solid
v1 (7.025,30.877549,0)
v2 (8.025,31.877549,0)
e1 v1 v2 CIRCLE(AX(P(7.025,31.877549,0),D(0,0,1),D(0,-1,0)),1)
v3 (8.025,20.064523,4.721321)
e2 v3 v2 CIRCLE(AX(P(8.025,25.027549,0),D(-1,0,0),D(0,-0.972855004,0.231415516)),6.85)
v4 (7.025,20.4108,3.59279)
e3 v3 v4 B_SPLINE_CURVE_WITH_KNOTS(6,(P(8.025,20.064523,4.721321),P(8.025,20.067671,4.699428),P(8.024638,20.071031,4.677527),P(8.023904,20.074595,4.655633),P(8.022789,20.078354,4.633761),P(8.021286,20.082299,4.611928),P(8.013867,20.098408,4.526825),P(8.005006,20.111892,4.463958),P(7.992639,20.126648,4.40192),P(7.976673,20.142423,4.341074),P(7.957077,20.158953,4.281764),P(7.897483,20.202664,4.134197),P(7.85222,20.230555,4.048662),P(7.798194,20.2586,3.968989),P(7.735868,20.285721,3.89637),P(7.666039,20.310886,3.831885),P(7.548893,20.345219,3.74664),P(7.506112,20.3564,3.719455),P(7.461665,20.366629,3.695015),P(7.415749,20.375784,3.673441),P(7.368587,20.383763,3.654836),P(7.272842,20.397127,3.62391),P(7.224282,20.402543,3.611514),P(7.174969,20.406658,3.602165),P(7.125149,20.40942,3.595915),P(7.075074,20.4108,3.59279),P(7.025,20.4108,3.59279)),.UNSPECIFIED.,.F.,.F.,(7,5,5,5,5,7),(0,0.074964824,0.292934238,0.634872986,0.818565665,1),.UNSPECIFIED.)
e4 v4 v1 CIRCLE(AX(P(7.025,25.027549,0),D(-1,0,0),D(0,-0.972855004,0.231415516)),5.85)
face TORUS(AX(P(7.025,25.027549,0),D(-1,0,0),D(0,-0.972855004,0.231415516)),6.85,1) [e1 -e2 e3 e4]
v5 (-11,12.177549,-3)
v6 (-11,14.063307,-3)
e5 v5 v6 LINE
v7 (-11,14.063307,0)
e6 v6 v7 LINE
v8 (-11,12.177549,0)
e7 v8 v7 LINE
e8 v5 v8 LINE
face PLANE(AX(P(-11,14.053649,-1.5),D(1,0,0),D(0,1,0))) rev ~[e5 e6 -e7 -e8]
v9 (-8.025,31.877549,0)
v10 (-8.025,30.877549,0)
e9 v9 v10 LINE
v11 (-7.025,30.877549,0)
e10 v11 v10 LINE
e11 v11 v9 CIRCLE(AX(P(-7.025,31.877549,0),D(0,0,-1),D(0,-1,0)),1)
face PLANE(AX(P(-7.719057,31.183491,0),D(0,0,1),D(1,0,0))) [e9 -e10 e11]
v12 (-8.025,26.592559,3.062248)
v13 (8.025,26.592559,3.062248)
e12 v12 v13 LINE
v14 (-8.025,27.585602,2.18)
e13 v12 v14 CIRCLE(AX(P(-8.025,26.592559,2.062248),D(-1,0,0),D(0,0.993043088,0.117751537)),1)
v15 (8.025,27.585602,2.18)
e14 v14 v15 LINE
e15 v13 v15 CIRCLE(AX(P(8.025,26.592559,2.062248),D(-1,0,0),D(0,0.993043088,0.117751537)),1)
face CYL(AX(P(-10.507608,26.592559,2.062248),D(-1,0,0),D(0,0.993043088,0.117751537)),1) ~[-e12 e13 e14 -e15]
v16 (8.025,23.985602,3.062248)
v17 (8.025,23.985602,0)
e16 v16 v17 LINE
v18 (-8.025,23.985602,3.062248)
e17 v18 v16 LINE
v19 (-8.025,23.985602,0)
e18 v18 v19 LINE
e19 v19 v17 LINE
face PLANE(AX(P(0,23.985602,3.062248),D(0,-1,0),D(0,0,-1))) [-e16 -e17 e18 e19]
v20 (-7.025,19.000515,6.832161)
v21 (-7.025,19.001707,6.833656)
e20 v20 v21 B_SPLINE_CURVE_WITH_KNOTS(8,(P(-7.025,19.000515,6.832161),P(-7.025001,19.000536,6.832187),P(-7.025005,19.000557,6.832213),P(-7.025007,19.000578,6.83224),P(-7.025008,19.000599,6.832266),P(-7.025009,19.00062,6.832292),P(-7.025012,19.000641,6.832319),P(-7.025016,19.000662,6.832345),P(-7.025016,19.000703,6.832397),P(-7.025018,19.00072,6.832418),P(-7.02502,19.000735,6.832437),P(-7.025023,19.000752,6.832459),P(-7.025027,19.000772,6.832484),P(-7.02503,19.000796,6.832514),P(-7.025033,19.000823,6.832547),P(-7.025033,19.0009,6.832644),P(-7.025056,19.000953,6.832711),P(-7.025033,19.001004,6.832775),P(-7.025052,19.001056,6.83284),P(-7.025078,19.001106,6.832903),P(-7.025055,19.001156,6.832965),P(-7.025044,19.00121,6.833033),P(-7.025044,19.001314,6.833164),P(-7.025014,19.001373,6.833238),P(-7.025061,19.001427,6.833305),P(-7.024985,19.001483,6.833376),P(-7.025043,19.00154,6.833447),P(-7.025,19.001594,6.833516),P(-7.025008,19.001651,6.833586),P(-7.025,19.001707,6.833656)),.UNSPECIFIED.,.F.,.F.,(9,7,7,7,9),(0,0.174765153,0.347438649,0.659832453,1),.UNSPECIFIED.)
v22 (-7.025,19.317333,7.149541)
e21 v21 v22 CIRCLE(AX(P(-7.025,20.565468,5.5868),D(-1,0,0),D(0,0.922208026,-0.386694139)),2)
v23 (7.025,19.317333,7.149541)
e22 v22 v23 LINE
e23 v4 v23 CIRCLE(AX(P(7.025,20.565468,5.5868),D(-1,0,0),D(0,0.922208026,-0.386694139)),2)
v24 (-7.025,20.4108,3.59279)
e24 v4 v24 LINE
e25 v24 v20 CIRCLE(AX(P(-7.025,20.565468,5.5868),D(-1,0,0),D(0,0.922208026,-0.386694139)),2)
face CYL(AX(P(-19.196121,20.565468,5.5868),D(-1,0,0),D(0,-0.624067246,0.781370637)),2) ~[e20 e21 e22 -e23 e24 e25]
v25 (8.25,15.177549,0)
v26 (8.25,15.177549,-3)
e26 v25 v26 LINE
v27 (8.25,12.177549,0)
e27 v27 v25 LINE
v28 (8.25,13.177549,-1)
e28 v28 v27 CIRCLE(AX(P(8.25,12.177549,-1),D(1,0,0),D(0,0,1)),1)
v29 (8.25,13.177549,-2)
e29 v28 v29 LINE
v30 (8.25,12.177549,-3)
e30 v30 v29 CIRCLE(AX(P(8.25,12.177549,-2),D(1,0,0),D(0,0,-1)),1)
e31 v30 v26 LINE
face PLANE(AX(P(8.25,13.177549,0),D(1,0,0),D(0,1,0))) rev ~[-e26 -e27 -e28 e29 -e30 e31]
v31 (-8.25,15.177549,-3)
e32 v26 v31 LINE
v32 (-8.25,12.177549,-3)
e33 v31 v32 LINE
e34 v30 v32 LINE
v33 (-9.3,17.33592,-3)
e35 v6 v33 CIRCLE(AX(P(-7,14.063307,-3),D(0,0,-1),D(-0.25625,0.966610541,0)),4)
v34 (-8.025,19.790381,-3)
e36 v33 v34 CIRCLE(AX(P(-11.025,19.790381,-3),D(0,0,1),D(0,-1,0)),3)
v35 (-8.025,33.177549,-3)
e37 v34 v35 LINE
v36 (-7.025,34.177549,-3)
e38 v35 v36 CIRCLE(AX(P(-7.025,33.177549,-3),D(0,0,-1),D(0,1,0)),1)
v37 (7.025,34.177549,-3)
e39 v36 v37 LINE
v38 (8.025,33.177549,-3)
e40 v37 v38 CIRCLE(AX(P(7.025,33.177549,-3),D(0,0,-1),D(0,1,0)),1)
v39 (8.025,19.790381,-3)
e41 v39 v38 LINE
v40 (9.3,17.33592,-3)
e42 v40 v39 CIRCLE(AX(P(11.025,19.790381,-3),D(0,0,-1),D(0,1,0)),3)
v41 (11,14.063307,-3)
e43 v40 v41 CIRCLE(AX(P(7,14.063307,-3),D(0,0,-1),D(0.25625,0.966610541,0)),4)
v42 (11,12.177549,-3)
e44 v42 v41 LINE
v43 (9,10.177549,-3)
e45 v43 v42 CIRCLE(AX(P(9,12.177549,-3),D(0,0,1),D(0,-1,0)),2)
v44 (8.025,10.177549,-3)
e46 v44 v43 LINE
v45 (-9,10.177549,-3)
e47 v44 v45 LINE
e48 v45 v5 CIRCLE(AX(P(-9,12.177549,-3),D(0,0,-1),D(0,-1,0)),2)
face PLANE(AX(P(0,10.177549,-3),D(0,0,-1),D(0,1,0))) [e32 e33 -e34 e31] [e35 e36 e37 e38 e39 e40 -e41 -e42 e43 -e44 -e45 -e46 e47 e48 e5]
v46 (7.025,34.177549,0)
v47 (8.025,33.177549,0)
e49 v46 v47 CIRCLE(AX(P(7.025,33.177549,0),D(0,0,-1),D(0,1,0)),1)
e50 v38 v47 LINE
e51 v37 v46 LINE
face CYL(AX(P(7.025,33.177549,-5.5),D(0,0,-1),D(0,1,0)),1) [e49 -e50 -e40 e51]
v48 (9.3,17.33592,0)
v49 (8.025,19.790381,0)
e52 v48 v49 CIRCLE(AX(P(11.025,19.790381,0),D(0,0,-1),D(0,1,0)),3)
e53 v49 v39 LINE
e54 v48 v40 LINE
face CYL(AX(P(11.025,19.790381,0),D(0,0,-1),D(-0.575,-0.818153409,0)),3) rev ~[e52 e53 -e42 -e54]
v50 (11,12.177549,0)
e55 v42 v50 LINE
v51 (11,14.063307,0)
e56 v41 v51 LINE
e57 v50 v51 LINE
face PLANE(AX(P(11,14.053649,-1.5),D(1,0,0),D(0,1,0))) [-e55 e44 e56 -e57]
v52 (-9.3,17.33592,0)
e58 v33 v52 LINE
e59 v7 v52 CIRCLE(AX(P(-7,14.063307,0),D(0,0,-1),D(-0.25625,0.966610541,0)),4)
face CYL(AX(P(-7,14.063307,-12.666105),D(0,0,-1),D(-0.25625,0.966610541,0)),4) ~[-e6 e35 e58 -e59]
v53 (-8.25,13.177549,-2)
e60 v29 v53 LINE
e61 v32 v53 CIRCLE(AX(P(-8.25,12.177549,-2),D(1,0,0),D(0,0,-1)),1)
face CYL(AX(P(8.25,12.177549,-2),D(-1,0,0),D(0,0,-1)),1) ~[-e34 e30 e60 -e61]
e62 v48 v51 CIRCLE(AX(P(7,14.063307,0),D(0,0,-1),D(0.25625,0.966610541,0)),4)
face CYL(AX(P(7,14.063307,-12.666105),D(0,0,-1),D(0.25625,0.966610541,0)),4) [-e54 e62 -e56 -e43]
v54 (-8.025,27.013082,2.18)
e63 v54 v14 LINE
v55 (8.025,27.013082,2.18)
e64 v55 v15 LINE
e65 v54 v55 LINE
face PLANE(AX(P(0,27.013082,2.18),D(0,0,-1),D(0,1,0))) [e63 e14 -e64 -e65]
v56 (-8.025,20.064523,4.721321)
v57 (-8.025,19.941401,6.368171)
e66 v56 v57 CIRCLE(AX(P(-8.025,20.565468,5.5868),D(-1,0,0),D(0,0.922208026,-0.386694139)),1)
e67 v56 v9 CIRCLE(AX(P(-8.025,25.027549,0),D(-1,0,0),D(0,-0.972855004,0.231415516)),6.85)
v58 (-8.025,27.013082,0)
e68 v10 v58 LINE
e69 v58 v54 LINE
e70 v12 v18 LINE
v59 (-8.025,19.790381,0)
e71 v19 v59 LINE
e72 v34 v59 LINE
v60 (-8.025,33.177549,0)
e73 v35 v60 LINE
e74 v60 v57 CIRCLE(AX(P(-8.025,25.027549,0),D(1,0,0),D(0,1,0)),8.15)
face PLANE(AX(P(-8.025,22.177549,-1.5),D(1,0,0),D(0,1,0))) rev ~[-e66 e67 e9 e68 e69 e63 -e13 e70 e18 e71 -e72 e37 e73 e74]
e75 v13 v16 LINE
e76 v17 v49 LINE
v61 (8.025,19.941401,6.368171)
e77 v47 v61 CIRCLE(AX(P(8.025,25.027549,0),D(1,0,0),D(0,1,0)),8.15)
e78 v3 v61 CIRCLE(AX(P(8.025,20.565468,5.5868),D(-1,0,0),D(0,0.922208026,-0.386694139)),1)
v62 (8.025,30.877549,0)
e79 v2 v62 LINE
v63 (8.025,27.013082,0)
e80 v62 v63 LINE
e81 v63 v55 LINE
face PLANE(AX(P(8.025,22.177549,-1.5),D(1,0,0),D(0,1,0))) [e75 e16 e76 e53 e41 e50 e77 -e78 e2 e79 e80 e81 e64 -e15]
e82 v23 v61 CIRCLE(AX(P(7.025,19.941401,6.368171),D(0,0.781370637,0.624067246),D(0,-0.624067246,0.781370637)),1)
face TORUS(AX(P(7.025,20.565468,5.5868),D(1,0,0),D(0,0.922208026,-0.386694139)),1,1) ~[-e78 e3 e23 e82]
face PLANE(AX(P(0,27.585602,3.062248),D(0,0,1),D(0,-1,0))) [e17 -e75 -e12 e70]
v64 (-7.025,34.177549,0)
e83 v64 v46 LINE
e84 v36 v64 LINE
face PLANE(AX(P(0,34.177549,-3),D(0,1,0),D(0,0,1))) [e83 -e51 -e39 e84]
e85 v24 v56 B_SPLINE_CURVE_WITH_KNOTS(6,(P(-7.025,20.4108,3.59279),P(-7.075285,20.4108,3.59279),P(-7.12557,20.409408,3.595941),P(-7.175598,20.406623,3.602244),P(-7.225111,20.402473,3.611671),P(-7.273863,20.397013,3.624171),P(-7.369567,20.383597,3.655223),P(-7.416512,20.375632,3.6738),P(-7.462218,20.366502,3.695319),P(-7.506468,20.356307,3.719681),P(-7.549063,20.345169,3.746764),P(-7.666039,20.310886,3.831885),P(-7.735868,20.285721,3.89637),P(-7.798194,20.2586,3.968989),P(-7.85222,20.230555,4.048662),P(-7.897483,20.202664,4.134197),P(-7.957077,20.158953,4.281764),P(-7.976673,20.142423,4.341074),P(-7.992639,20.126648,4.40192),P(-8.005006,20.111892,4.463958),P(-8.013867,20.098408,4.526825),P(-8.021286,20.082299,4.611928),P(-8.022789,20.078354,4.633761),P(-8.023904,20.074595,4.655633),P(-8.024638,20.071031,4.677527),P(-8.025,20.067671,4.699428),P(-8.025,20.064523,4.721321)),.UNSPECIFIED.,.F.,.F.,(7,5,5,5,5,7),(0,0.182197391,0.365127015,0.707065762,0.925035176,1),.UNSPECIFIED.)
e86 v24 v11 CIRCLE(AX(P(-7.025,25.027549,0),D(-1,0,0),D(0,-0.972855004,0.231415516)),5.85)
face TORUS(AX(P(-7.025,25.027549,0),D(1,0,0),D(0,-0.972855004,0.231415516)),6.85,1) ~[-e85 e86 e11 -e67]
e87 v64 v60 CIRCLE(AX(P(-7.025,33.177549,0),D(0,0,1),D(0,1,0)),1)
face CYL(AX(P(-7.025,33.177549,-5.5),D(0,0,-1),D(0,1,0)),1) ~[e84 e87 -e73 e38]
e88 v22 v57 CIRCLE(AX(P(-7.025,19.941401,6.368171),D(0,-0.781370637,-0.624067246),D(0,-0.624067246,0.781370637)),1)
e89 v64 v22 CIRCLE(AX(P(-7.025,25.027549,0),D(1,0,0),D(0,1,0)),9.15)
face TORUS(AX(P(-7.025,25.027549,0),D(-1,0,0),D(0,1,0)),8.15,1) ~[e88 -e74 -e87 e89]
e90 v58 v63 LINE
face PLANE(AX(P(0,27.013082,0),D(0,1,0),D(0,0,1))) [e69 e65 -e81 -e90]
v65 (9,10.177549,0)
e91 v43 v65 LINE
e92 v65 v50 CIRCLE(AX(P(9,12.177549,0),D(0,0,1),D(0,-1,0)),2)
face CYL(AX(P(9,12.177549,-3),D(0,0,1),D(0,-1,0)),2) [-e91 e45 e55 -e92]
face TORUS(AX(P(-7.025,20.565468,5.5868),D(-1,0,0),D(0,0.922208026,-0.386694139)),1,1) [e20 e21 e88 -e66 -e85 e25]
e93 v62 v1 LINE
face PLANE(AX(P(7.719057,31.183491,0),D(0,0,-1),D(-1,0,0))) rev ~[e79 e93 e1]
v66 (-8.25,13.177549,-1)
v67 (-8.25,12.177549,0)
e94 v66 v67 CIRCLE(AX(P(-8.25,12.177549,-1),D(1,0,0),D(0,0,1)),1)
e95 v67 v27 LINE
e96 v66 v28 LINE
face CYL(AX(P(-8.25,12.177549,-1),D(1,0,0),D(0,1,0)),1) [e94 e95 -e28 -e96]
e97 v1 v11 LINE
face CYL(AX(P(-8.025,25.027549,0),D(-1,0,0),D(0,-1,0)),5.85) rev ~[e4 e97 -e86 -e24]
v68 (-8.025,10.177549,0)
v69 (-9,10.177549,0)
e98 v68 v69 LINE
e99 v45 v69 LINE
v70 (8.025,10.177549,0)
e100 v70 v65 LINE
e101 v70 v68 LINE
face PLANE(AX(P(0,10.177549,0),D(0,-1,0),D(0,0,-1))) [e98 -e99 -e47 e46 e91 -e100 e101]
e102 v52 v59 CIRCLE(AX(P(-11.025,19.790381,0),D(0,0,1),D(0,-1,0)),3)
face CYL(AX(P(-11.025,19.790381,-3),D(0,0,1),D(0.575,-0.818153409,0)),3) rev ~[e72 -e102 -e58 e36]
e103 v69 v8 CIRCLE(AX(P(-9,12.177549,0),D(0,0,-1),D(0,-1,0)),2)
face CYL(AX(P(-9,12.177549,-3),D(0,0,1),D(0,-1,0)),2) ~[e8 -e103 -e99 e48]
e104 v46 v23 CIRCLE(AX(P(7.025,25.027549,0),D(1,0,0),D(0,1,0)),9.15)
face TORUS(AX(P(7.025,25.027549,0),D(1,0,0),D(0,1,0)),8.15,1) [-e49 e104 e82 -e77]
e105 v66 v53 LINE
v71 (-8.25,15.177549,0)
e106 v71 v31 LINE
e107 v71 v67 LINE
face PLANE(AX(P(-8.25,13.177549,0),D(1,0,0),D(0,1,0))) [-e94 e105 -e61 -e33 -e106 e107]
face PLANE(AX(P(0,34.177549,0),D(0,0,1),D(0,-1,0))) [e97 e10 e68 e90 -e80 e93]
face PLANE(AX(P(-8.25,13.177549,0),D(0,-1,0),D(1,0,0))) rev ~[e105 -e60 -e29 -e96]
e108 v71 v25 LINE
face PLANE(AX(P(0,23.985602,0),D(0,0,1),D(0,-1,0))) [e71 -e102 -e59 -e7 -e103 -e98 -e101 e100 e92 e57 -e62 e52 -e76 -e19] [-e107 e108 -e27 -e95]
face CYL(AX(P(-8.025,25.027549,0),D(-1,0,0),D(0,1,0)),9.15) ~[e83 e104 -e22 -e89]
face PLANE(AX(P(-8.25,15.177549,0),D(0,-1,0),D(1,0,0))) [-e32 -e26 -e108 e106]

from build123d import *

# Parameters (mm, degrees)
F3_DEPTH       = 16.05
F4_W           = 5.4241176695
F4_H           = 3.5927895224
F5_DEPTH       = 25
F5_DEPTH_BACK  = 25
F6_T1_DEPTH    = 38.39224199
F8_DEPTH       = 8.025
F8_DEPTH_BACK  = 8.025
F9_T1_DEPTH    = 21.0152154422
F11_W          = 7.7522003338
F11_H          = 3
F12_DEPTH      = 11
F12_DEPTH_BACK = 11
F13_W          = 16.5
F13_H          = 2
F14_DEPTH      = 25
F15_R          = 1
F16_T1_DEPTH   = 22.3322108151
F17_T3_ANGLE   = 128.6137584612
F17_T6_ANGLE   = 128.6137584612
F17_T9_ANGLE   = 166.6195765903
F17_T12_ANGLE  = 166.6195765903
F17_T15_ANGLE  = 208.6372867238
F17_T18_ANGLE  = 208.6372867238
F17_T21_DEPTH  = 5.5
F17_T24_DEPTH  = 5.5
F18_R          = 2
F19_R          = 3


# Not quite as in the source:
# - a fillet or chamfer that OpenCascade refuses, or shapes differently, is made with other operations: its cross-section is extruded or revolved along the edge and cut away or added


with BuildPart() as f3:
    # F2 (on line) → F3 (new body)
    with BuildSketch(Plane.YZ.offset(-8.025)):
        with BuildLine():
            Line((30.8775485963, 0), (34.1775485963, 0))
            ThreePointArc((34.1775485963, 0), (25.0275485963, 9.15), (15.8775485963, 0))
            Line((15.8775485963, 0), (19.1775485963, 0))
            ThreePointArc((19.1775485963, 0), (25.0275485963, 5.85), (30.8775485963, 0))
        make_face()
    extrude(amount=F3_DEPTH)

    # F4 (on Right) → F5 (cut, two sides)
    with BuildSketch(Plane.YZ) as f5_sk:
        with Locations((17.9089335725, 1.7963947612)):
            Rectangle(F4_W, F4_H)
    extrude(amount=-F5_DEPTH, mode=Mode.SUBTRACT)
    extrude(f5_sk.sketch, amount=F5_DEPTH_BACK, mode=Mode.SUBTRACT)

    # F6: fillet of radius 2 on 1 edges, made by hand

    # F6_s2 → F6_t1 (cut)
    with BuildSketch(Plane.YZ.offset(-19.196120995)):
        with BuildLine():
            ThreePointArc((19.3173332992, 7.1495413322), (18.6537711345, 4.9990791235), (20.4108004498, 3.5927895224))
            Line((20.4108004498, 3.5927895224), (16.6124215356, 3.5927895224))
            ThreePointArc((16.6124215356, 3.5927895224), (17.7444211746, 5.5388225246), (19.3173332992, 7.1495413322))
        make_face()
    extrude(amount=F6_T1_DEPTH, mode=Mode.SUBTRACT)

    # F7 (on Right) → F8 (join, two sides)
    with BuildSketch(Plane.YZ) as f8_sk:
        Polygon((34.1775485963, 0), (27.0130820572, 0), (23.9856019616, 0), (10.1775485963, 0), (10.1775485963, -3), (34.1775485963, -3), align=None)
        Polygon((23.9856019616, 0), (27.0130820572, 0), (27.0130820572, 2.18), (27.5856019616, 2.18), (27.5856019616, 3.0622484628), (23.9856019616, 3.0622484628), (23.9856019616, 2.18), align=None)
    extrude(amount=F8_DEPTH)
    extrude(f8_sk.sketch, amount=-F8_DEPTH_BACK)

    # F9: fillet of radius 1 on 1 edges, made by hand

    # F9_s2 → F9_t1 (cut)
    with BuildSketch(Plane.YZ.offset(-10.5076077211)):
        with BuildLine():
            ThreePointArc((27.5856019616, 2.18), (27.2567307119, 2.8098284041), (26.5925588732, 3.0622484628))
            Line((26.5925588732, 3.0622484628), (27.5856019616, 3.0622484628))
            Line((27.5856019616, 3.0622484628), (27.5856019616, 2.18))
        make_face()
    extrude(amount=F9_T1_DEPTH, mode=Mode.SUBTRACT)

    # F10: union 

    # F11 (on Right) → F12 (join, two sides)
    with BuildSketch(Plane.YZ) as f12_sk:
        with Locations((14.0536487631, -1.5)):
            Rectangle(F11_W, F11_H)
    extrude(amount=F12_DEPTH)
    extrude(f12_sk.sketch, amount=-F12_DEPTH_BACK)

    # F13 (on Top) → F14 (cut)
    with BuildSketch(Plane.XY):
        with Locations((0, 14.1775485963)):
            Rectangle(F13_W, F13_H)
    extrude(amount=-F14_DEPTH, mode=Mode.SUBTRACT)

    # F15
    f15_edges = [f3.edges().sort_by_distance(p)[0] for p in [
        (0, 13.177549, -3),
        (0, 13.177549, 0),
    ]]
    fillet(f15_edges, radius=F15_R)

    # F16: fillet of radius 4 on 2 edges, made by hand

    # F16_s2 → F16_t1 (cut)
    with BuildSketch(Plane.XY.offset(-12.6661054076)):
        with BuildLine():
            ThreePointArc((-8.025, 17.92974893), (-10.1701734968, 16.5025689505), (-11, 14.063306767))
            Line((-11, 14.063306767), (-11, 17.92974893))
            Line((-11, 17.92974893), (-8.025, 17.92974893))
        make_face()
        with BuildLine():
            ThreePointArc((8.025, 17.92974893), (10.1701734968, 16.5025689505), (11, 14.063306767))
            Line((11, 14.063306767), (11, 17.92974893))
            Line((11, 17.92974893), (8.025, 17.92974893))
        make_face()
    extrude(amount=F16_T1_DEPTH, mode=Mode.SUBTRACT)

    # F17: fillet of radius 1 on 8 edges, made by hand


with BuildPart() as f17_tool1:
    # F17_s2 → F17_t3 (revolve)
    with BuildSketch(Plane.XY):
        with BuildLine():
            ThreePointArc((-7.025, 34.1775485963), (-7.7321067812, 33.8846553774), (-8.025, 33.1775485963))
            Line((-8.025, 33.1775485963), (-8.025, 34.1775485963))
            Line((-8.025, 34.1775485963), (-7.025, 34.1775485963))
        make_face()
    revolve(axis=Axis((-8.025, 25.0275485963, 0), (1, 0, 0)), revolution_arc=F17_T3_ANGLE)


with BuildPart() as f17_tool4:
    # F17_s5 → F17_t6 (revolve)
    with BuildSketch(Plane.XY):
        with BuildLine():
            ThreePointArc((7.025, 34.1775485963), (7.7321067812, 33.8846553774), (8.025, 33.1775485963))
            Line((8.025, 33.1775485963), (8.025, 34.1775485963))
            Line((8.025, 34.1775485963), (7.025, 34.1775485963))
        make_face()
    revolve(axis=Axis((8.025, 25.0275485963, 0), (1, 0, 0)), revolution_arc=F17_T6_ANGLE)


with BuildPart() as f17_tool7:
    # F17_s8 → F17_t9 (revolve)
    with BuildSketch(Plane(origin=(0, 1.3403038382, 5.634545684), x_dir=(1, 0, 0), z_dir=(0, -0.2314155158, -0.9728550041))):
        with BuildLine():
            ThreePointArc((-7.025, -18.4981758925), (-7.7321067812, -18.2052826737), (-8.025, -17.4981758925))
            Line((-8.025, -17.4981758925), (-8.025, -18.4981758925))
            Line((-8.025, -18.4981758925), (-7.025, -18.4981758925))
        make_face()
    revolve(axis=Axis((-8.025, 25.0275485963, 0), (-1, 0, 0)), revolution_arc=F17_T9_ANGLE)


with BuildPart() as f17_tool10:
    # F17_s11 → F17_t12 (revolve)
    with BuildSketch(Plane(origin=(0, 1.3403038382, 5.634545684), x_dir=(1, 0, 0), z_dir=(0, -0.2314155158, -0.9728550041))):
        with BuildLine():
            ThreePointArc((7.025, -18.4981758925), (7.7321067812, -18.2052826737), (8.025, -17.4981758925))
            Line((8.025, -17.4981758925), (8.025, -18.4981758925))
            Line((8.025, -18.4981758925), (7.025, -18.4981758925))
        make_face()
    revolve(axis=Axis((8.025, 25.0275485963, 0), (-1, 0, 0)), revolution_arc=F17_T12_ANGLE)


with BuildPart() as f17_tool13:
    # F17_s14 → F17_t15 (revolve)
    with BuildSketch(Plane(origin=(0, 5.0675252641, 12.0852942927), x_dir=(1, 0, 0), z_dir=(0, 0.3866941389, 0.9222080259))):
        with BuildLine():
            ThreePointArc((-7.025, 18.8052566142), (-7.7321067812, 18.5123633954), (-8.025, 17.8052566142))
            Line((-8.025, 17.8052566142), (-8.025, 18.8052566142))
            Line((-8.025, 18.8052566142), (-7.025, 18.8052566142))
        make_face()
    revolve(axis=Axis((-8.025, 20.5654677903, 5.5868000574), (-1, 0, 0)), revolution_arc=F17_T15_ANGLE)


with BuildPart() as f17_tool16:
    # F17_s17 → F17_t18 (revolve)
    with BuildSketch(Plane(origin=(0, 5.0675252641, 12.0852942927), x_dir=(1, 0, 0), z_dir=(0, 0.3866941389, 0.9222080259))):
        with BuildLine():
            ThreePointArc((7.025, 18.8052566142), (7.7321067812, 18.5123633954), (8.025, 17.8052566142))
            Line((8.025, 17.8052566142), (8.025, 18.8052566142))
            Line((8.025, 18.8052566142), (7.025, 18.8052566142))
        make_face()
    revolve(axis=Axis((8.025, 20.5654677903, 5.5868000574), (-1, 0, 0)), revolution_arc=F17_T18_ANGLE)


with BuildPart() as f17_tool19:
    # F17_s20 → F17_t21 (new body)
    with BuildSketch(Plane.XY.offset(-5.5)):
        with BuildLine():
            ThreePointArc((7.025, 34.1775485963), (7.7321067812, 33.8846553774), (8.025, 33.1775485963))
            Line((8.025, 33.1775485963), (8.025, 34.1775485963))
            Line((8.025, 34.1775485963), (7.025, 34.1775485963))
        make_face()
    extrude(amount=F17_T21_DEPTH)


with BuildPart() as f17_tool22:
    # F17_s23 → F17_t24 (new body)
    with BuildSketch(Plane.XY.offset(-5.5)):
        with BuildLine():
            ThreePointArc((-7.025, 34.1775485963), (-7.7321067812, 33.8846553774), (-8.025, 33.1775485963))
            Line((-8.025, 33.1775485963), (-8.025, 34.1775485963))
            Line((-8.025, 34.1775485963), (-7.025, 34.1775485963))
        make_face()
    extrude(amount=F17_T24_DEPTH)


with BuildPart() as f3_1:
    add(f3.part)

    # F17_t25: cut F17_tool1, F17_tool4, F17_tool7, F17_tool10, F17_tool13, F17_tool16, F17_tool19, F17_tool22
    add([f17_tool1.part, f17_tool4.part, f17_tool7.part, f17_tool10.part, f17_tool13.part, f17_tool16.part, f17_tool19.part, f17_tool22.part], mode=Mode.SUBTRACT)

    # F18
    f18_edges = [f3_1.edges().sort_by_distance(p)[0] for p in [
        (-11, 10.177549, -1.5),
        (11, 10.177549, -1.5),
    ]]
    fillet(f18_edges, radius=F18_R)

    # F19
    f19_edges = [f3_1.edges().sort_by_distance(p)[0] for p in [
        (-8.025, 17.929749, -1.5),
        (8.025, 17.929749, -1.5),
    ]]
    fillet(f19_edges, radius=F19_R)


solid = f3_1.part
